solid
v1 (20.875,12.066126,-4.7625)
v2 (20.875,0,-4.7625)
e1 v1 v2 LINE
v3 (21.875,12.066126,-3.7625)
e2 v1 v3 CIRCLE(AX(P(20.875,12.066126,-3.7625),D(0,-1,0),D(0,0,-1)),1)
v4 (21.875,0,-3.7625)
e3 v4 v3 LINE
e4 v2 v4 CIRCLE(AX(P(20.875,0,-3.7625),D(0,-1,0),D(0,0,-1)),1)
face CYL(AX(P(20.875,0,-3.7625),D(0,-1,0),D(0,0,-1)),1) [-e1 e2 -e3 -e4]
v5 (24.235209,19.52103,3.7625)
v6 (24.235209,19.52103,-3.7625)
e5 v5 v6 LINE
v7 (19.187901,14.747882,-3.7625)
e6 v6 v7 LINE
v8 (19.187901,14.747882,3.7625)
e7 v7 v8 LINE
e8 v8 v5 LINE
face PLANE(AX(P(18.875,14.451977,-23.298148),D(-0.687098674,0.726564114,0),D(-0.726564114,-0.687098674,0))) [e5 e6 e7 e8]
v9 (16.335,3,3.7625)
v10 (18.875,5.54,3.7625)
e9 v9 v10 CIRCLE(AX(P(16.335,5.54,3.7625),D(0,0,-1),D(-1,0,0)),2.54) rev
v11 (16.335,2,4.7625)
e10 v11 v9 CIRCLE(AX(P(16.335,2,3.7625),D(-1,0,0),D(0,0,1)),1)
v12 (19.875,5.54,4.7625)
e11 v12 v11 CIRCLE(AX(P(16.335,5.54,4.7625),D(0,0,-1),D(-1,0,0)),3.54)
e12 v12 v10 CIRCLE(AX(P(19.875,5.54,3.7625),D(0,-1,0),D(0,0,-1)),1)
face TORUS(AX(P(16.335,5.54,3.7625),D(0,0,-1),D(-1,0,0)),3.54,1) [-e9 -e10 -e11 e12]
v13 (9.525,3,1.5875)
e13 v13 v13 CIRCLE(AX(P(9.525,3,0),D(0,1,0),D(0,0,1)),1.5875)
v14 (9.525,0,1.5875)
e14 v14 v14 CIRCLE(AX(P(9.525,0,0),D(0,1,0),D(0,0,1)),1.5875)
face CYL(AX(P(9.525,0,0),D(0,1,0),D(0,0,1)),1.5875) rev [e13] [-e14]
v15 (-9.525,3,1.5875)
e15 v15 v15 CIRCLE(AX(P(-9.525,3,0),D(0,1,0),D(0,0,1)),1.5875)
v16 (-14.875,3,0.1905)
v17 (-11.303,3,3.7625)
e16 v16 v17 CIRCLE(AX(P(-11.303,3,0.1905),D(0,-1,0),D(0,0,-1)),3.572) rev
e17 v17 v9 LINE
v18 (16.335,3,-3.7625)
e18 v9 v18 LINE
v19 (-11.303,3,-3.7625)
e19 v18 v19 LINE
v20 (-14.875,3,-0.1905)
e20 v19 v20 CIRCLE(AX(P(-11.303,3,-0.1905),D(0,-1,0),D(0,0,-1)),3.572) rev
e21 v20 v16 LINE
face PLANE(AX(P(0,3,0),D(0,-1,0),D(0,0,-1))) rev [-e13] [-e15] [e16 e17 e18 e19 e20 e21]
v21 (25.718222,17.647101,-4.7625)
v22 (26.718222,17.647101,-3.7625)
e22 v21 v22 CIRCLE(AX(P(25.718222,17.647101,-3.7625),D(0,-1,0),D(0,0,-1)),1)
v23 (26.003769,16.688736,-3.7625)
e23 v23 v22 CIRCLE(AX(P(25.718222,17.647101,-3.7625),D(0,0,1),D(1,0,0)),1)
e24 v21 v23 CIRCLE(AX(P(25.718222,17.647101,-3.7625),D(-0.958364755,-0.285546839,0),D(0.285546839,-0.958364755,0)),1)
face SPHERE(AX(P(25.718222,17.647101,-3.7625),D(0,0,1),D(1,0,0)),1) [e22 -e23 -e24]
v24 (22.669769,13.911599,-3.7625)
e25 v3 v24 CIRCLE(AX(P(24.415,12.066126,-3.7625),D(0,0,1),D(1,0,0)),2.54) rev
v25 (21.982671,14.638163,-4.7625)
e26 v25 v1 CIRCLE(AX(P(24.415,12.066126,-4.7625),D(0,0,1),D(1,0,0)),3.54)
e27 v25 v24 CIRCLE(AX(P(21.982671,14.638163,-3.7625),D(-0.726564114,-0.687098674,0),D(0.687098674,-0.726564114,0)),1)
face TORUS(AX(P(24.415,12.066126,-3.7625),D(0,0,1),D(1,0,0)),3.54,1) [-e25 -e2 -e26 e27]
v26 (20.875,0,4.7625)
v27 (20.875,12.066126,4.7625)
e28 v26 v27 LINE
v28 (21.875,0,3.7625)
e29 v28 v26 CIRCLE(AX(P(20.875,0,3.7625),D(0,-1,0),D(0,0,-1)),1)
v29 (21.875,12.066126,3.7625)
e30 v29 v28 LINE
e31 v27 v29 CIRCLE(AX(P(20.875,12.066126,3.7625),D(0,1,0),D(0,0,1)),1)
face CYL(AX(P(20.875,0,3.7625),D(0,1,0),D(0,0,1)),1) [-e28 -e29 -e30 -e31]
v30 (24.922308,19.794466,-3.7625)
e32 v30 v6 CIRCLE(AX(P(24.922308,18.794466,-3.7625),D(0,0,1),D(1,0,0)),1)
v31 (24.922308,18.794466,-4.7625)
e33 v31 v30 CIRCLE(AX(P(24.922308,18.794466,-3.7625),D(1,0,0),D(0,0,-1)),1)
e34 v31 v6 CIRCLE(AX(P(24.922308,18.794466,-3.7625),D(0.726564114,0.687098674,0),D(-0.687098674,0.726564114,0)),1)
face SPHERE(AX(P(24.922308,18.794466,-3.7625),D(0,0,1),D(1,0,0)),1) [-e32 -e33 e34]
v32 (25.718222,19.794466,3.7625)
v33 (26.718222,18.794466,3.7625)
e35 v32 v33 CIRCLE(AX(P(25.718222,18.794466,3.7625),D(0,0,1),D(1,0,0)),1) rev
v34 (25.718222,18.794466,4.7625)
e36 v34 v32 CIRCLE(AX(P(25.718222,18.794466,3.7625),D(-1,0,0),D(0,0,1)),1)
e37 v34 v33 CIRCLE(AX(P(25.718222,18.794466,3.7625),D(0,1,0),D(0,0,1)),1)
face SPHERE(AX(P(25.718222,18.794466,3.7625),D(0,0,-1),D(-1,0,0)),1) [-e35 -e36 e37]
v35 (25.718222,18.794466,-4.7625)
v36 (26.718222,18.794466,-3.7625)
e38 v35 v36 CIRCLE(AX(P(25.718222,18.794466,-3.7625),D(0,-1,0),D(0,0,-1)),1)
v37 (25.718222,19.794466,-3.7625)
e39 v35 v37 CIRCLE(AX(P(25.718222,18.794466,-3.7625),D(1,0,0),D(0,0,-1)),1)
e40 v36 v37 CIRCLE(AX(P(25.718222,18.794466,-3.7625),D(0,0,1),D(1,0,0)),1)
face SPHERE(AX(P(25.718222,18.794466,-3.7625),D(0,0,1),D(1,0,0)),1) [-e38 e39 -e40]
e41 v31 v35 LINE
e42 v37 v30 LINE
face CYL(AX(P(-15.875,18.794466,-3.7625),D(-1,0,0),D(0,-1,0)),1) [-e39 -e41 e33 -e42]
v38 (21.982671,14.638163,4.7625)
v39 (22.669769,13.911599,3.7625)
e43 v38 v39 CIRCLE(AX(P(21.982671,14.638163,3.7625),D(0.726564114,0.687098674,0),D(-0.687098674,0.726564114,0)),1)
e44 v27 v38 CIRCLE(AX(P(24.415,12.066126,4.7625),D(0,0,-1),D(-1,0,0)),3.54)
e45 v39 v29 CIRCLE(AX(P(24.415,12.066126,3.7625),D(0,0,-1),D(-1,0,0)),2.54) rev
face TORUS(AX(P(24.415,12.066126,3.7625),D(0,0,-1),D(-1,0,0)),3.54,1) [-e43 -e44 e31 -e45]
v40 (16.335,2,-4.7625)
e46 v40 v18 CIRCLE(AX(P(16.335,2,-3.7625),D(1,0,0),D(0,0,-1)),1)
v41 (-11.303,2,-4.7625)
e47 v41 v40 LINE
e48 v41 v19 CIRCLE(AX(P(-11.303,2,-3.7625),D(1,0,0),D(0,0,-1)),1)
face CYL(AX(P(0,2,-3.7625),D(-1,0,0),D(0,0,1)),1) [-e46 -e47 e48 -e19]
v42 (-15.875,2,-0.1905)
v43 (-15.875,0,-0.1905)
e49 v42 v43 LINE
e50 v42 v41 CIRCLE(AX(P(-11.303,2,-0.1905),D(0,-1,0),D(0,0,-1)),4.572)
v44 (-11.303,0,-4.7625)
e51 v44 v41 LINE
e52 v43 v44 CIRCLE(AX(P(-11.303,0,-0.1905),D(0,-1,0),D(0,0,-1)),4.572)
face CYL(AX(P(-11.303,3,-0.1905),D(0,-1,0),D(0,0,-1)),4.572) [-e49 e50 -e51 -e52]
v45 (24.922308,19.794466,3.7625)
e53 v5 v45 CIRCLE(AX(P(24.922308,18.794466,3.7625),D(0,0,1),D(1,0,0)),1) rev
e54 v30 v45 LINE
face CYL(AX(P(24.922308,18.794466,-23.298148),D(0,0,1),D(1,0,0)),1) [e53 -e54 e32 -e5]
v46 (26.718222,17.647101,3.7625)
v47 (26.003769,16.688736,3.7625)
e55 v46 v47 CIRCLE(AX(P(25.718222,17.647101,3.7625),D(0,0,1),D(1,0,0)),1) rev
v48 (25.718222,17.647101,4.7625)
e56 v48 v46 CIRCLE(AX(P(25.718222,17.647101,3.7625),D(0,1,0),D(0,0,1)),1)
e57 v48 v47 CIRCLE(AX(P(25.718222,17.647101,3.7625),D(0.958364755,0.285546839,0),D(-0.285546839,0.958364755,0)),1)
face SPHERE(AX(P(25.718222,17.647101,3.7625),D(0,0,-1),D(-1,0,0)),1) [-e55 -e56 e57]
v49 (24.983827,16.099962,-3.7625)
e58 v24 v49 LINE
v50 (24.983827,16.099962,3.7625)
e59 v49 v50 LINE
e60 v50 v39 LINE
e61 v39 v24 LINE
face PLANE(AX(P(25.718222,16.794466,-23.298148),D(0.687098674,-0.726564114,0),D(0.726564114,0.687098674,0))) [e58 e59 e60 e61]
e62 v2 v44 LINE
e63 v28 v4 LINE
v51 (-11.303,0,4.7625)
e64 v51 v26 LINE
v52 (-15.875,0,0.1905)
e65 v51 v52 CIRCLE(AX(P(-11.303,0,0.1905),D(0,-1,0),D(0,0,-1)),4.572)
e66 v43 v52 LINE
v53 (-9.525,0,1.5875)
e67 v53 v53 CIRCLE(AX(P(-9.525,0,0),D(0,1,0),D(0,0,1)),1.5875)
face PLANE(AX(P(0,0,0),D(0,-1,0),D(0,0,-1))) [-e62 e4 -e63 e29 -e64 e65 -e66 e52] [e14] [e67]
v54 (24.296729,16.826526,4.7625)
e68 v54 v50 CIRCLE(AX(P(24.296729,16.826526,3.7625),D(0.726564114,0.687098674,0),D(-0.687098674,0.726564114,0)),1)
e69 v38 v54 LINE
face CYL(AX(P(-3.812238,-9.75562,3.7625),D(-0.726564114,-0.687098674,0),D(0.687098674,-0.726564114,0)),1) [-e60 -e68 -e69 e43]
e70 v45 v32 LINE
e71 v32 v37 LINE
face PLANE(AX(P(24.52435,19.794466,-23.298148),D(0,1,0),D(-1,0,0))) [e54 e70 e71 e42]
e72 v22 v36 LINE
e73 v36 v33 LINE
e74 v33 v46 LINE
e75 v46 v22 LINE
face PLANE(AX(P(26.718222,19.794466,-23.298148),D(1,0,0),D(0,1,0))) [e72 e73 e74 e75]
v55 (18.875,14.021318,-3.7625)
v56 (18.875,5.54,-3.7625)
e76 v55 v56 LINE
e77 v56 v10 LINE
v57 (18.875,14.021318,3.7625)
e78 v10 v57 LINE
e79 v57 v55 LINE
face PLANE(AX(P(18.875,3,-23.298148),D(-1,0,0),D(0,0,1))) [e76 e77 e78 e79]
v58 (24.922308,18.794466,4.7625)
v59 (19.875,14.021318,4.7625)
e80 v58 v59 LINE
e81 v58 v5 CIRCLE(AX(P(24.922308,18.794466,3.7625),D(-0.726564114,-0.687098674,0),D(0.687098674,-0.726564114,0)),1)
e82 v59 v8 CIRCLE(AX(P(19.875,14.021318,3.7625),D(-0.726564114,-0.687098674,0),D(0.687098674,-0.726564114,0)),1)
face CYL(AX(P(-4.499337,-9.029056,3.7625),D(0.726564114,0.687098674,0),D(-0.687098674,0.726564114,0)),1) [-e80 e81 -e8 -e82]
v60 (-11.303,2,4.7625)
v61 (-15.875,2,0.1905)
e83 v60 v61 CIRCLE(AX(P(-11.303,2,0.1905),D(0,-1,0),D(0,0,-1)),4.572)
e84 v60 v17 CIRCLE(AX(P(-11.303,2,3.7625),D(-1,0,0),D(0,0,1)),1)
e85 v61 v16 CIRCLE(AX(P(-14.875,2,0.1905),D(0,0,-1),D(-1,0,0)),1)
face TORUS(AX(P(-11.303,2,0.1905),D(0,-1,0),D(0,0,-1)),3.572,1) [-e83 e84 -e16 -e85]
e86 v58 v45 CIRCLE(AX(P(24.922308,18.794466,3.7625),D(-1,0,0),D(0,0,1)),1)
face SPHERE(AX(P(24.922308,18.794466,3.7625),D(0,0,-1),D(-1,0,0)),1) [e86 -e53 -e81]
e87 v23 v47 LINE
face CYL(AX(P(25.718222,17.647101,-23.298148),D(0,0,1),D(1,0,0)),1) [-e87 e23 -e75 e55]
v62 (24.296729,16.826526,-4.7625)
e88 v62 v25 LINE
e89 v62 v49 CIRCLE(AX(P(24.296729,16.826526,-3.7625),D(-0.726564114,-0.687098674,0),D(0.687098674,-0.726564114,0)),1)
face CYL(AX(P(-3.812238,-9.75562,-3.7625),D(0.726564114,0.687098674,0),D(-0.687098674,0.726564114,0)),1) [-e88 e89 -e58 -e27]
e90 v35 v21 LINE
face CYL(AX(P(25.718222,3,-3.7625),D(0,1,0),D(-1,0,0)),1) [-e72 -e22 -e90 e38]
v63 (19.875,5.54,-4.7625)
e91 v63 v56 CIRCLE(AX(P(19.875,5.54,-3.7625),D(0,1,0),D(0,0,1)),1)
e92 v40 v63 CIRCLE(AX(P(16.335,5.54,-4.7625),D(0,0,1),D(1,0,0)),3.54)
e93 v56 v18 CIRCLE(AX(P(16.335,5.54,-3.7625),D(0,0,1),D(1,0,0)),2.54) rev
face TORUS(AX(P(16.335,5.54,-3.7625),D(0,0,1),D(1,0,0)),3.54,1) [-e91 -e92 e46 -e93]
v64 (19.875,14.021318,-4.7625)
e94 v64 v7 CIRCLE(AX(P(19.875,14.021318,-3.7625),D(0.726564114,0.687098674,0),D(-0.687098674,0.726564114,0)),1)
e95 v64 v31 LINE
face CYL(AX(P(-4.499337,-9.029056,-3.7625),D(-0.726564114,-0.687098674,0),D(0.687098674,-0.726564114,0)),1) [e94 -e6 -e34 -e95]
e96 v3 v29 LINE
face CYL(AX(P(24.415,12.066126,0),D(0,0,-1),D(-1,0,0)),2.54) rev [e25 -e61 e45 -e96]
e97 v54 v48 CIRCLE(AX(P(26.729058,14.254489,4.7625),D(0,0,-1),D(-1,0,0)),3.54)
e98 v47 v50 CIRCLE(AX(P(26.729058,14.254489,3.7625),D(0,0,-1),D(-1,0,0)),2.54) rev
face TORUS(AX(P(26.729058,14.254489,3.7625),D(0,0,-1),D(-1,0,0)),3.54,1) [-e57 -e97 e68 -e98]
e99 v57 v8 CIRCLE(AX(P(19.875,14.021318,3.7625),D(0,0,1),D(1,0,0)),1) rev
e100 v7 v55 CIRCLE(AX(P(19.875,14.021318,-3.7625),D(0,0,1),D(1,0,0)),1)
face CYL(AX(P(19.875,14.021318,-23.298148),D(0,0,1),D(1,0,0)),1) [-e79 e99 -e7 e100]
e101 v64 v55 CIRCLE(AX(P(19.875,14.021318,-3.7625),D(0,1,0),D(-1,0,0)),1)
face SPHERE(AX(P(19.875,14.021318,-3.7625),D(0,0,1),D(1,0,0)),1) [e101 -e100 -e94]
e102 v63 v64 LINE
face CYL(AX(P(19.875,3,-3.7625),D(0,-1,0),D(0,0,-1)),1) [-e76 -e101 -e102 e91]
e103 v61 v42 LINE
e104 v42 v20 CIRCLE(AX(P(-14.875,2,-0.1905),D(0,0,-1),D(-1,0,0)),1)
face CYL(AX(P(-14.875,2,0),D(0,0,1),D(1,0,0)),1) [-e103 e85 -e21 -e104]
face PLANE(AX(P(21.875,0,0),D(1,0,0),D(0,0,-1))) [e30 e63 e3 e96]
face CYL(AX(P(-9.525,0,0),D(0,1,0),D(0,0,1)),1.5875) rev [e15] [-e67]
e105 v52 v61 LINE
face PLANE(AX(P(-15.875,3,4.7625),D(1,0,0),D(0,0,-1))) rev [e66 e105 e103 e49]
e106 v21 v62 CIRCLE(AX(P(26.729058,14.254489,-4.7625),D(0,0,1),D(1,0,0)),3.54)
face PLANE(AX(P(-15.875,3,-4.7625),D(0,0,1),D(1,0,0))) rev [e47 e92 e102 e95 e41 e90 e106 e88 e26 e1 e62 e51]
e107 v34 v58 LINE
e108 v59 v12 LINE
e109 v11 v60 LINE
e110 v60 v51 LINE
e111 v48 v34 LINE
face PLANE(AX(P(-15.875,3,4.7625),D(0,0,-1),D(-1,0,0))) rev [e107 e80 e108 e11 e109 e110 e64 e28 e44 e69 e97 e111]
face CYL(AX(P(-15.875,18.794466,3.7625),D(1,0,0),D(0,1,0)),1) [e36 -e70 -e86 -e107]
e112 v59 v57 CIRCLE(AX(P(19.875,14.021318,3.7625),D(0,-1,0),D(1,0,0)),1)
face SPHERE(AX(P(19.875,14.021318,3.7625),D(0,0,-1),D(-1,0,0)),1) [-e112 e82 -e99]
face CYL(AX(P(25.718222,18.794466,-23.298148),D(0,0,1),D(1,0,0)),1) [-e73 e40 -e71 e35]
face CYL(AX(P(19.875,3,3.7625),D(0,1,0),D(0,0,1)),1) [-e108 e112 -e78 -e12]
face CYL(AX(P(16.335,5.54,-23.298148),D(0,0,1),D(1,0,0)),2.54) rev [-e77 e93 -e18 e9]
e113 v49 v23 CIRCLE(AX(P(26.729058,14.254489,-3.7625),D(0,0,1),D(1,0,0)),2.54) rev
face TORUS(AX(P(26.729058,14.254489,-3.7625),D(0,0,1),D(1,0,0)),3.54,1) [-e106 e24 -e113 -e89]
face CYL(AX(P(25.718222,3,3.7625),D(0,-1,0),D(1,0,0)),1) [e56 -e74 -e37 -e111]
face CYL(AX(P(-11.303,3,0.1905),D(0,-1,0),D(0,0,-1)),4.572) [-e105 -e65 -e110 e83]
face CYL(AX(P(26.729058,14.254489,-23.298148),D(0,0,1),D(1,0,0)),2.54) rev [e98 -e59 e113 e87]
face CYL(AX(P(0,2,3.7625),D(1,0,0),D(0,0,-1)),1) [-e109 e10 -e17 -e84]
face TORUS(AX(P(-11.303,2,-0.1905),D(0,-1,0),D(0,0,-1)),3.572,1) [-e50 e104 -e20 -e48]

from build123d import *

# Parameters (mm, degrees)
SKETCH1_W           = 31.75
SKETCH1_H           = 9.525
BOSS_EXTRUDE1_DEPTH = 3
SKETCH2_R           = 1.5875
CUT_EXTRUDE1_DEPTH  = 17.843308204
FILLET1_R           = 4.572
SKETCH3_W           = 9.525
SKETCH3_H           = 3
BOSS_EXTRUDE2_DEPTH = 6
BOSS_EXTRUDE3_DEPTH = 9.525
FILLET3_R           = 2.54
FILLET4_R           = 1
FILLET5_R           = 2.54
FILLET7_R           = 1


with BuildPart() as part:
    # Sketch1 → Boss-Extrude1 (new body)
    with BuildSketch(Plane(origin=(0, 0, 0), x_dir=(1, 0, 0), z_dir=(0, 1, 0))):
        Rectangle(SKETCH1_W, SKETCH1_H)
    extrude(amount=BOSS_EXTRUDE1_DEPTH)

    # Sketch2 → Cut-Extrude1 (cut, through all)
    with BuildSketch(Plane(origin=(0, 3, 0), x_dir=(1, 0, 0), z_dir=(0, 1, 0))):
        with Locations(Location((-9.525, 0, 0), (0, 0, 270))):
            Circle(SKETCH2_R)
        with Locations(Location((9.525, 0, 0), (0, 0, 270))):
            Circle(SKETCH2_R)
    extrude(amount=-CUT_EXTRUDE1_DEPTH, mode=Mode.SUBTRACT)

    # Fillet1
    fillet1_edges = [part.edges().sort_by_distance(p)[0] for p in [
        (-15.875, 1.5, 4.7625),
        (-15.875, 1.5, -4.7625),
    ]]
    fillet(fillet1_edges, radius=FILLET1_R)

    # Sketch3 → Boss-Extrude2 (add)
    with BuildSketch(Plane(origin=(15.875, 0, 0), x_dir=(0, 0, -1), z_dir=(1, 0, 0))):
        with Locations((0, 1.5)):
            Rectangle(SKETCH3_W, SKETCH3_H)
    extrude(amount=BOSS_EXTRUDE2_DEPTH)

    # Sketch5 → Boss-Extrude3 (add)
    with BuildSketch(Plane.XY.offset(4.7625)):
        Polygon((18.875, 3), (18.875, 14.451976797), (24.524350343, 19.794466274), (26.718222037, 19.794466274), (26.718222037, 16.794466274), (25.718222037, 16.794466274), (21.875, 13.16), (21.875, 3), align=None)
    extrude(amount=-BOSS_EXTRUDE3_DEPTH)

    # Fillet3
    # the kernel refuses this fillet: 2.54 mm, written as the material it adds along each edge
    with BuildSketch(Plane(origin=(21.875, 13.16, 4.7625), x_dir=(0, -1, 0), z_dir=(0, 0, -1))) as fillet3_piece_1:
        with BuildLine():
            CenterArc((FILLET3_R * 0.430658932297, -FILLET3_R), FILLET3_R, 90, 46.599119654)
            Line((-FILLET3_R * 0.295905181539, -FILLET3_R * 0.312901325509), (0, 0))
            Line((0, 0), (FILLET3_R * 0.430658932297, 0))
        make_face()
    extrude(amount=9.525)
    with BuildSketch(Plane(origin=(25.718222037, 16.794466274, 4.7625), x_dir=(-0.7265641138352414, -0.6870986744906513, 0), z_dir=(0, 0, -1))) as fillet3_piece_2_section:
        with BuildLine():
            CenterArc((FILLET3_R * 0.39795723135, -FILLET3_R), FILLET3_R, 90, 43.400880346)
            Line((-FILLET3_R * 0.28914144314, -FILLET3_R * 0.273435886165), (0, 0))
            Line((0, 0), (FILLET3_R * 0.39795723135, 0))
        make_face()
    fillet3_piece_2 = extrude(amount=9.525, mode=Mode.PRIVATE)
    fillet3_piece_2 = split(fillet3_piece_2, bisect_by=Plane(origin=(26.718222037, 16.648240502, 0), z_dir=(-1, 0, 0)), keep=Keep.TOP, mode=Mode.PRIVATE)
    add(fillet3_piece_2)

    # Fillet4
    fillet4_edges = [part.edges().sort_by_distance(p)[0] for p in [
        (18.875, 14.451976797, 0),
        (24.524350343, 19.794466274, 0),
        (26.718222037, 19.794466274, 0),
        (26.718222037, 16.794443265, 0),
    ]]
    fillet(fillet4_edges, radius=FILLET4_R)

    # Fillet5
    fillet5_edges = [part.edges().sort_by_distance(p)[0] for p in [
        (18.875, 3, 0),
    ]]
    fillet(fillet5_edges, radius=FILLET5_R)

    # Fillet7
    fillet7_edges = [part.edges().sort_by_distance(p)[0] for p in [
        (18.875, 9.780658932, -4.7625),
        (2.516, 3, -4.7625),
        (18.131051224, 3.743948776, 4.7625),
        (18.131051224, 3.743948776, -4.7625),
        (2.516, 3, 4.7625),
        (-15.875, 3, 0),
        (-14.535892204, 3, -3.423392204),
        (-14.535892204, 3, 3.423392204),
        (21.875, 6.033063156, -4.7625),
        (21.875, 6.033063156, 4.7625),
        (23.826786069, 15.005769142, -4.7625),
        (23.826786069, 15.005769142, 4.7625),
        (22.082138473, 13.070793966, 4.7625),
        (22.082138473, 13.070793966, -4.7625),
        (25.459186859, 16.454259389, 4.7625),
        (21.711555113, 17.134456183, -4.7625),
        (21.711555113, 17.134456183, 4.7625),
        (26.718222037, 18.220775531, 4.7625),
        (25.320264806, 19.794466274, 4.7625),
        (18.875, 9.780658932, 4.7625),
        (26.519951397, 17.049397551, 4.7625),
        (26.425328818, 19.501573055, 4.7625),
        (24.552553679, 19.723596005, 4.7625),
        (18.95655058, 14.416856311, 4.7625),
        (25.320264806, 19.794466274, -4.7625),
        (26.718222037, 18.220775531, -4.7625),
        (25.459186859, 16.454259389, -4.7625),
        (26.519951397, 17.049397551, -4.7625),
        (26.425328818, 19.501573055, -4.7625),
        (24.552553679, 19.723596005, -4.7625),
        (18.95655058, 14.416856311, -4.7625),
    ]]
    fillet(fillet7_edges, radius=FILLET7_R)


solid = part.part
